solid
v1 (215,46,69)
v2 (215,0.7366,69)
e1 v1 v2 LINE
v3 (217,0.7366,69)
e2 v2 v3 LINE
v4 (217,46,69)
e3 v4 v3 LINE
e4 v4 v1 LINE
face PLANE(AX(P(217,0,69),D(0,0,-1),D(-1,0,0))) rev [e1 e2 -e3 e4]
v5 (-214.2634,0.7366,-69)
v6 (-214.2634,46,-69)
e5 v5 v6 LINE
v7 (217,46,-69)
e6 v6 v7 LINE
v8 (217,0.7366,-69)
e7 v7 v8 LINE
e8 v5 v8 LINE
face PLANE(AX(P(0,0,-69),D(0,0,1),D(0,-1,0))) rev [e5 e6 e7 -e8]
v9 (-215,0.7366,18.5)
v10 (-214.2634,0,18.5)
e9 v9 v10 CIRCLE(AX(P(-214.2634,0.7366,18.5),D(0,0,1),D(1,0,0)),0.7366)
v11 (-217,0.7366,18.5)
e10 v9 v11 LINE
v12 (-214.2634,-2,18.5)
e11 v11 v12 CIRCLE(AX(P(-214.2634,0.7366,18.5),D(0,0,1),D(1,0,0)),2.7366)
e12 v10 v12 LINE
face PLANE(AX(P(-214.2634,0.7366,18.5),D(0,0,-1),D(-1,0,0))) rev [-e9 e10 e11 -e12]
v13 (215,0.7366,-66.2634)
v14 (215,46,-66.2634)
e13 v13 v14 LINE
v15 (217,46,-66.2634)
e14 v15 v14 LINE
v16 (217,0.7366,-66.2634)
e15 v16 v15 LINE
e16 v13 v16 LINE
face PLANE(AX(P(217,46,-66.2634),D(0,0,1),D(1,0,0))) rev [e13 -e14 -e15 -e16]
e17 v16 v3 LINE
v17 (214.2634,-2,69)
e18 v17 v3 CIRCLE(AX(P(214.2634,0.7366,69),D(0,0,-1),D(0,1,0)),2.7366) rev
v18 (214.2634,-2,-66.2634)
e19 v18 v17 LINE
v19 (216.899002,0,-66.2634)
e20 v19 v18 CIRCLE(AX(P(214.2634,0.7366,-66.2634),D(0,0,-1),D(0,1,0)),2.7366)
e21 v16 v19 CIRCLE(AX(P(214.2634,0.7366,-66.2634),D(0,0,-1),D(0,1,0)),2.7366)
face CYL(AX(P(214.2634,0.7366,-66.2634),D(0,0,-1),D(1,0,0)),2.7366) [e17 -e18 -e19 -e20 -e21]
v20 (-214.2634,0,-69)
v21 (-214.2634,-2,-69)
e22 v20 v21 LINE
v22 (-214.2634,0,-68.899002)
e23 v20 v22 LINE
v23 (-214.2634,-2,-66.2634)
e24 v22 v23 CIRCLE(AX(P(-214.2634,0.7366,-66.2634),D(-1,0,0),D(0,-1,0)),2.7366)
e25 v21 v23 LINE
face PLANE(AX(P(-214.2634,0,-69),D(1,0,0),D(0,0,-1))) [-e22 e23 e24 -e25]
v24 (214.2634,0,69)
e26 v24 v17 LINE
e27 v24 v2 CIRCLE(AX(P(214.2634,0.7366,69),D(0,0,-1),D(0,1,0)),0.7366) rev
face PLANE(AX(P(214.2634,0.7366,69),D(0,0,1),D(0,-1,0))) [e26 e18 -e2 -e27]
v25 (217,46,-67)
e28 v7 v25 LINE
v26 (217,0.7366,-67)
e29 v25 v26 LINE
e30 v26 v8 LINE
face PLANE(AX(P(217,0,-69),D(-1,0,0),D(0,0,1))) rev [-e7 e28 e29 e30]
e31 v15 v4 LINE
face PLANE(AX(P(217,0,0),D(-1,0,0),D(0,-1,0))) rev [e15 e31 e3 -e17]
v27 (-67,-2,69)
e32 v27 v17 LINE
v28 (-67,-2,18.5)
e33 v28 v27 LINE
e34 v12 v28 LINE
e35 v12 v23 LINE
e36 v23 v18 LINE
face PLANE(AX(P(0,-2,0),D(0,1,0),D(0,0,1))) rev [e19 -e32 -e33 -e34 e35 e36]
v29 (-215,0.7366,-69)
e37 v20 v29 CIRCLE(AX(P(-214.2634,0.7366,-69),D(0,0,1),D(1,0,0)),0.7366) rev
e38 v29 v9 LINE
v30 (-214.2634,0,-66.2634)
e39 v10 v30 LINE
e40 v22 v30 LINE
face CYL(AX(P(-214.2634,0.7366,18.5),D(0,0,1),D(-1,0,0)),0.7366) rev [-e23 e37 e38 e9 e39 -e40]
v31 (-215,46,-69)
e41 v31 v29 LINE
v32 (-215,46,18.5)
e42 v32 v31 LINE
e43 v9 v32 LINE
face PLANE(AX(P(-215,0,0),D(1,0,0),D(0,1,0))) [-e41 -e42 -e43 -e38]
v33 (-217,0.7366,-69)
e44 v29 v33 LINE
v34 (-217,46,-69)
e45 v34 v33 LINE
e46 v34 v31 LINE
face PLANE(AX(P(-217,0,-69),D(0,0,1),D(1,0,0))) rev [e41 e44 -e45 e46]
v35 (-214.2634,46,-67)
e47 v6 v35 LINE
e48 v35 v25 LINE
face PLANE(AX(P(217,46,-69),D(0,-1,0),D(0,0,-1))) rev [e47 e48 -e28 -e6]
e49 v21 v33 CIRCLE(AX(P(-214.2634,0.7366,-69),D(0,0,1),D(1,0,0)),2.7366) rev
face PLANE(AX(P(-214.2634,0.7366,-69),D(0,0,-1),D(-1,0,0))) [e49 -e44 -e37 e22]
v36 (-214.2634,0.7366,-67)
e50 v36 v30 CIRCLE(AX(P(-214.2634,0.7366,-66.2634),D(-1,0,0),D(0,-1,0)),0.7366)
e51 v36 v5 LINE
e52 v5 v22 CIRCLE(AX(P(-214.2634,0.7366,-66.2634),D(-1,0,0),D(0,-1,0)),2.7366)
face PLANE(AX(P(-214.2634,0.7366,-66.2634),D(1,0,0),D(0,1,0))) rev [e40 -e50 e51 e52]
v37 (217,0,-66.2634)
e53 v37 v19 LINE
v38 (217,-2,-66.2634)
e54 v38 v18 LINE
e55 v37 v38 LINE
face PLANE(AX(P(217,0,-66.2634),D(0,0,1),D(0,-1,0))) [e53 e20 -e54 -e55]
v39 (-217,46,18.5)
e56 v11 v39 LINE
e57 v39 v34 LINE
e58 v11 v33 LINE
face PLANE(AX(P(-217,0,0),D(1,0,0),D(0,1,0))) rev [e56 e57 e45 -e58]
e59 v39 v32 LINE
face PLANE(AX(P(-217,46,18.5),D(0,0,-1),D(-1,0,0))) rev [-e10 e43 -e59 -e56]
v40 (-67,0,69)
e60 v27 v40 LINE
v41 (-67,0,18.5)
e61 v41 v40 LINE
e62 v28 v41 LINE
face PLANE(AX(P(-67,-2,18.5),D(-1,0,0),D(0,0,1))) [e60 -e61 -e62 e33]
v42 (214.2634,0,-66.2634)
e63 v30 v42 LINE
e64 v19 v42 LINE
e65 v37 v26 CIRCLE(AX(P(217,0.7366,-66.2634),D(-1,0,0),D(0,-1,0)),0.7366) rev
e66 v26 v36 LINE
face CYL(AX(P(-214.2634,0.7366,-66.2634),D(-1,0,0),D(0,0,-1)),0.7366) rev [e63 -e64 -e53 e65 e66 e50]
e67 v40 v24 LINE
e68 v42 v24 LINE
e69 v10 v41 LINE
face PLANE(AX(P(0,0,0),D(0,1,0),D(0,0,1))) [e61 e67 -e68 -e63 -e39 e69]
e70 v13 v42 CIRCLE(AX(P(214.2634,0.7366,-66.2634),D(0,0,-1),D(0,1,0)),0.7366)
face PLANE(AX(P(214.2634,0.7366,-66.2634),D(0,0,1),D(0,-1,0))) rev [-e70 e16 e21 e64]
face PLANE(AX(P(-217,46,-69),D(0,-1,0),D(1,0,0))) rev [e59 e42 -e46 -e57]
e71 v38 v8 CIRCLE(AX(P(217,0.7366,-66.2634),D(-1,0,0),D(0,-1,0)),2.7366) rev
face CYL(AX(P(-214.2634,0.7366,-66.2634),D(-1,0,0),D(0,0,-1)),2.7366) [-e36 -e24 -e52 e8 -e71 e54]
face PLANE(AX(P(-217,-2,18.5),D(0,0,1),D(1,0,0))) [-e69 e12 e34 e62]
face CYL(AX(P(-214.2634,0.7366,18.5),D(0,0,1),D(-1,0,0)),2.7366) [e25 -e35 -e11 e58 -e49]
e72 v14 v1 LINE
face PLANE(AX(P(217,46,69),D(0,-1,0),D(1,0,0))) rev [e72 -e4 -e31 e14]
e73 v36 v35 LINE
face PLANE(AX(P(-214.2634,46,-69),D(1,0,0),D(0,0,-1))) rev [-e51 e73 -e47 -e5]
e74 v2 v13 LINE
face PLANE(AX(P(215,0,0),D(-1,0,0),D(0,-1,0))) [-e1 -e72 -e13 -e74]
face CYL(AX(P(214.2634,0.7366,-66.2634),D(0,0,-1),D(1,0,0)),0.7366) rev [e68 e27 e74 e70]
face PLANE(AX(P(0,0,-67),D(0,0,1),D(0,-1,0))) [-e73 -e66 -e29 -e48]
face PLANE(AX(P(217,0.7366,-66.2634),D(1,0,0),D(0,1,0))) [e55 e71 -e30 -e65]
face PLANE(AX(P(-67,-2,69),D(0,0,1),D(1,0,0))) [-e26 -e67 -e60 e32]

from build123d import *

# Parameters (mm, degrees)
BRIDA_BASE1_DEPTH                = 2
BRIDA_DE_ARISTA1_STRIP_W         = 9.4732
BRIDA_DE_ARISTA1_STRIP_H         = 2
BRIDA_DE_ARISTA1_STRIP_CUT_DEPTH = 87.5
BRIDA_DE_ARISTA1_DEPTH           = 87.5
BRIDA_DE_ARISTA2_STRIP_W         = 9.4732
BRIDA_DE_ARISTA2_STRIP_H         = 2
BRIDA_DE_ARISTA2_STRIP_CUT_DEPTH = 431.2634
BRIDA_DE_ARISTA2_DEPTH           = 431.2634
BRIDA_DE_ARISTA3_STRIP_W         = 9.4732
BRIDA_DE_ARISTA3_STRIP_H         = 2
BRIDA_DE_ARISTA3_STRIP_CUT_DEPTH = 135.2634
BRIDA_DE_ARISTA3_DEPTH           = 135.2634


# Sheet-metal steps are written as plain solids
with BuildPart() as part:
    # Croquis1 → Brida base1 (new body)
    with BuildSketch(Plane(origin=(0, 0, 0), x_dir=(1, 0, 0), z_dir=(0, 1, 0))):
        Polygon((-67, -69), (217, -69), (217, 69), (-217, 69), (-217, -18.5), (-67, -18.5), align=None)
    extrude(amount=-BRIDA_BASE1_DEPTH)

    # Brida de arista1 strip (across the edge) → Brida de arista1 strip cut (cut)
    with BuildSketch(Plane(origin=(-217, 0, -69), x_dir=(1, 0, 0), z_dir=(0, 0, 1))):
        with Locations((-2, -1)):
            Rectangle(BRIDA_DE_ARISTA1_STRIP_W, BRIDA_DE_ARISTA1_STRIP_H)
    extrude(amount=BRIDA_DE_ARISTA1_STRIP_CUT_DEPTH, mode=Mode.SUBTRACT)

    # Brida de arista1 section (across the edge) → Brida de arista1 (add)
    with BuildSketch(Plane(origin=(-217, 0, -69), x_dir=(1, 0, 0), z_dir=(0, 0, 1))):
        with BuildLine():
            Line((0, 0.7366), (0, 46))
            Line((0, 46), (2, 46))
            Line((2, 46), (2, 0.7366))
            ThreePointArc((2, 0.7366), (2.215745145, 0.215745145), (2.7366, 0))
            Line((2.7366, 0), (2.7366, -2))
            ThreePointArc((2.7366, -2), (0.801531583, -1.198468417), (0, 0.7366))
        make_face()
    extrude(amount=BRIDA_DE_ARISTA1_DEPTH)

    # Brida de arista2 strip (across the edge) → Brida de arista2 strip cut (cut)
    with BuildSketch(Plane(origin=(217, 0, -69), x_dir=(0, 0, 1), z_dir=(-1, 0, 0))):
        with Locations((-2, -1)):
            Rectangle(BRIDA_DE_ARISTA2_STRIP_W, BRIDA_DE_ARISTA2_STRIP_H)
    extrude(amount=BRIDA_DE_ARISTA2_STRIP_CUT_DEPTH, mode=Mode.SUBTRACT)

    # Brida de arista2 section (across the edge) → Brida de arista2 (add)
    with BuildSketch(Plane(origin=(217, 0, -69), x_dir=(0, 0, 1), z_dir=(-1, 0, 0))):
        with BuildLine():
            Line((0, 0.7366), (0, 46))
            Line((0, 46), (2, 46))
            Line((2, 46), (2, 0.7366))
            ThreePointArc((2, 0.7366), (2.215745145, 0.215745145), (2.7366, 0))
            Line((2.7366, 0), (2.7366, -2))
            ThreePointArc((2.7366, -2), (0.801531583, -1.198468417), (0, 0.7366))
        make_face()
    extrude(amount=BRIDA_DE_ARISTA2_DEPTH)

    # Brida de arista3 strip (across the edge) → Brida de arista3 strip cut (cut)
    with BuildSketch(Plane(origin=(217, 0, 69), x_dir=(-1, 0, 0), z_dir=(0, 0, -1))):
        with Locations((-2, -1)):
            Rectangle(BRIDA_DE_ARISTA3_STRIP_W, BRIDA_DE_ARISTA3_STRIP_H)
    extrude(amount=BRIDA_DE_ARISTA3_STRIP_CUT_DEPTH, mode=Mode.SUBTRACT)

    # Brida de arista3 section (across the edge) → Brida de arista3 (add)
    with BuildSketch(Plane(origin=(217, 0, 69), x_dir=(-1, 0, 0), z_dir=(0, 0, -1))):
        with BuildLine():
            Line((0, 0.7366), (0, 46))
            Line((0, 46), (2, 46))
            Line((2, 46), (2, 0.7366))
            ThreePointArc((2, 0.7366), (2.215745145, 0.215745145), (2.7366, 0))
            Line((2.7366, 0), (2.7366, -2))
            ThreePointArc((2.7366, -2), (0.801531583, -1.198468417), (0, 0.7366))
        make_face()
    extrude(amount=BRIDA_DE_ARISTA3_DEPTH)


solid = part.part
